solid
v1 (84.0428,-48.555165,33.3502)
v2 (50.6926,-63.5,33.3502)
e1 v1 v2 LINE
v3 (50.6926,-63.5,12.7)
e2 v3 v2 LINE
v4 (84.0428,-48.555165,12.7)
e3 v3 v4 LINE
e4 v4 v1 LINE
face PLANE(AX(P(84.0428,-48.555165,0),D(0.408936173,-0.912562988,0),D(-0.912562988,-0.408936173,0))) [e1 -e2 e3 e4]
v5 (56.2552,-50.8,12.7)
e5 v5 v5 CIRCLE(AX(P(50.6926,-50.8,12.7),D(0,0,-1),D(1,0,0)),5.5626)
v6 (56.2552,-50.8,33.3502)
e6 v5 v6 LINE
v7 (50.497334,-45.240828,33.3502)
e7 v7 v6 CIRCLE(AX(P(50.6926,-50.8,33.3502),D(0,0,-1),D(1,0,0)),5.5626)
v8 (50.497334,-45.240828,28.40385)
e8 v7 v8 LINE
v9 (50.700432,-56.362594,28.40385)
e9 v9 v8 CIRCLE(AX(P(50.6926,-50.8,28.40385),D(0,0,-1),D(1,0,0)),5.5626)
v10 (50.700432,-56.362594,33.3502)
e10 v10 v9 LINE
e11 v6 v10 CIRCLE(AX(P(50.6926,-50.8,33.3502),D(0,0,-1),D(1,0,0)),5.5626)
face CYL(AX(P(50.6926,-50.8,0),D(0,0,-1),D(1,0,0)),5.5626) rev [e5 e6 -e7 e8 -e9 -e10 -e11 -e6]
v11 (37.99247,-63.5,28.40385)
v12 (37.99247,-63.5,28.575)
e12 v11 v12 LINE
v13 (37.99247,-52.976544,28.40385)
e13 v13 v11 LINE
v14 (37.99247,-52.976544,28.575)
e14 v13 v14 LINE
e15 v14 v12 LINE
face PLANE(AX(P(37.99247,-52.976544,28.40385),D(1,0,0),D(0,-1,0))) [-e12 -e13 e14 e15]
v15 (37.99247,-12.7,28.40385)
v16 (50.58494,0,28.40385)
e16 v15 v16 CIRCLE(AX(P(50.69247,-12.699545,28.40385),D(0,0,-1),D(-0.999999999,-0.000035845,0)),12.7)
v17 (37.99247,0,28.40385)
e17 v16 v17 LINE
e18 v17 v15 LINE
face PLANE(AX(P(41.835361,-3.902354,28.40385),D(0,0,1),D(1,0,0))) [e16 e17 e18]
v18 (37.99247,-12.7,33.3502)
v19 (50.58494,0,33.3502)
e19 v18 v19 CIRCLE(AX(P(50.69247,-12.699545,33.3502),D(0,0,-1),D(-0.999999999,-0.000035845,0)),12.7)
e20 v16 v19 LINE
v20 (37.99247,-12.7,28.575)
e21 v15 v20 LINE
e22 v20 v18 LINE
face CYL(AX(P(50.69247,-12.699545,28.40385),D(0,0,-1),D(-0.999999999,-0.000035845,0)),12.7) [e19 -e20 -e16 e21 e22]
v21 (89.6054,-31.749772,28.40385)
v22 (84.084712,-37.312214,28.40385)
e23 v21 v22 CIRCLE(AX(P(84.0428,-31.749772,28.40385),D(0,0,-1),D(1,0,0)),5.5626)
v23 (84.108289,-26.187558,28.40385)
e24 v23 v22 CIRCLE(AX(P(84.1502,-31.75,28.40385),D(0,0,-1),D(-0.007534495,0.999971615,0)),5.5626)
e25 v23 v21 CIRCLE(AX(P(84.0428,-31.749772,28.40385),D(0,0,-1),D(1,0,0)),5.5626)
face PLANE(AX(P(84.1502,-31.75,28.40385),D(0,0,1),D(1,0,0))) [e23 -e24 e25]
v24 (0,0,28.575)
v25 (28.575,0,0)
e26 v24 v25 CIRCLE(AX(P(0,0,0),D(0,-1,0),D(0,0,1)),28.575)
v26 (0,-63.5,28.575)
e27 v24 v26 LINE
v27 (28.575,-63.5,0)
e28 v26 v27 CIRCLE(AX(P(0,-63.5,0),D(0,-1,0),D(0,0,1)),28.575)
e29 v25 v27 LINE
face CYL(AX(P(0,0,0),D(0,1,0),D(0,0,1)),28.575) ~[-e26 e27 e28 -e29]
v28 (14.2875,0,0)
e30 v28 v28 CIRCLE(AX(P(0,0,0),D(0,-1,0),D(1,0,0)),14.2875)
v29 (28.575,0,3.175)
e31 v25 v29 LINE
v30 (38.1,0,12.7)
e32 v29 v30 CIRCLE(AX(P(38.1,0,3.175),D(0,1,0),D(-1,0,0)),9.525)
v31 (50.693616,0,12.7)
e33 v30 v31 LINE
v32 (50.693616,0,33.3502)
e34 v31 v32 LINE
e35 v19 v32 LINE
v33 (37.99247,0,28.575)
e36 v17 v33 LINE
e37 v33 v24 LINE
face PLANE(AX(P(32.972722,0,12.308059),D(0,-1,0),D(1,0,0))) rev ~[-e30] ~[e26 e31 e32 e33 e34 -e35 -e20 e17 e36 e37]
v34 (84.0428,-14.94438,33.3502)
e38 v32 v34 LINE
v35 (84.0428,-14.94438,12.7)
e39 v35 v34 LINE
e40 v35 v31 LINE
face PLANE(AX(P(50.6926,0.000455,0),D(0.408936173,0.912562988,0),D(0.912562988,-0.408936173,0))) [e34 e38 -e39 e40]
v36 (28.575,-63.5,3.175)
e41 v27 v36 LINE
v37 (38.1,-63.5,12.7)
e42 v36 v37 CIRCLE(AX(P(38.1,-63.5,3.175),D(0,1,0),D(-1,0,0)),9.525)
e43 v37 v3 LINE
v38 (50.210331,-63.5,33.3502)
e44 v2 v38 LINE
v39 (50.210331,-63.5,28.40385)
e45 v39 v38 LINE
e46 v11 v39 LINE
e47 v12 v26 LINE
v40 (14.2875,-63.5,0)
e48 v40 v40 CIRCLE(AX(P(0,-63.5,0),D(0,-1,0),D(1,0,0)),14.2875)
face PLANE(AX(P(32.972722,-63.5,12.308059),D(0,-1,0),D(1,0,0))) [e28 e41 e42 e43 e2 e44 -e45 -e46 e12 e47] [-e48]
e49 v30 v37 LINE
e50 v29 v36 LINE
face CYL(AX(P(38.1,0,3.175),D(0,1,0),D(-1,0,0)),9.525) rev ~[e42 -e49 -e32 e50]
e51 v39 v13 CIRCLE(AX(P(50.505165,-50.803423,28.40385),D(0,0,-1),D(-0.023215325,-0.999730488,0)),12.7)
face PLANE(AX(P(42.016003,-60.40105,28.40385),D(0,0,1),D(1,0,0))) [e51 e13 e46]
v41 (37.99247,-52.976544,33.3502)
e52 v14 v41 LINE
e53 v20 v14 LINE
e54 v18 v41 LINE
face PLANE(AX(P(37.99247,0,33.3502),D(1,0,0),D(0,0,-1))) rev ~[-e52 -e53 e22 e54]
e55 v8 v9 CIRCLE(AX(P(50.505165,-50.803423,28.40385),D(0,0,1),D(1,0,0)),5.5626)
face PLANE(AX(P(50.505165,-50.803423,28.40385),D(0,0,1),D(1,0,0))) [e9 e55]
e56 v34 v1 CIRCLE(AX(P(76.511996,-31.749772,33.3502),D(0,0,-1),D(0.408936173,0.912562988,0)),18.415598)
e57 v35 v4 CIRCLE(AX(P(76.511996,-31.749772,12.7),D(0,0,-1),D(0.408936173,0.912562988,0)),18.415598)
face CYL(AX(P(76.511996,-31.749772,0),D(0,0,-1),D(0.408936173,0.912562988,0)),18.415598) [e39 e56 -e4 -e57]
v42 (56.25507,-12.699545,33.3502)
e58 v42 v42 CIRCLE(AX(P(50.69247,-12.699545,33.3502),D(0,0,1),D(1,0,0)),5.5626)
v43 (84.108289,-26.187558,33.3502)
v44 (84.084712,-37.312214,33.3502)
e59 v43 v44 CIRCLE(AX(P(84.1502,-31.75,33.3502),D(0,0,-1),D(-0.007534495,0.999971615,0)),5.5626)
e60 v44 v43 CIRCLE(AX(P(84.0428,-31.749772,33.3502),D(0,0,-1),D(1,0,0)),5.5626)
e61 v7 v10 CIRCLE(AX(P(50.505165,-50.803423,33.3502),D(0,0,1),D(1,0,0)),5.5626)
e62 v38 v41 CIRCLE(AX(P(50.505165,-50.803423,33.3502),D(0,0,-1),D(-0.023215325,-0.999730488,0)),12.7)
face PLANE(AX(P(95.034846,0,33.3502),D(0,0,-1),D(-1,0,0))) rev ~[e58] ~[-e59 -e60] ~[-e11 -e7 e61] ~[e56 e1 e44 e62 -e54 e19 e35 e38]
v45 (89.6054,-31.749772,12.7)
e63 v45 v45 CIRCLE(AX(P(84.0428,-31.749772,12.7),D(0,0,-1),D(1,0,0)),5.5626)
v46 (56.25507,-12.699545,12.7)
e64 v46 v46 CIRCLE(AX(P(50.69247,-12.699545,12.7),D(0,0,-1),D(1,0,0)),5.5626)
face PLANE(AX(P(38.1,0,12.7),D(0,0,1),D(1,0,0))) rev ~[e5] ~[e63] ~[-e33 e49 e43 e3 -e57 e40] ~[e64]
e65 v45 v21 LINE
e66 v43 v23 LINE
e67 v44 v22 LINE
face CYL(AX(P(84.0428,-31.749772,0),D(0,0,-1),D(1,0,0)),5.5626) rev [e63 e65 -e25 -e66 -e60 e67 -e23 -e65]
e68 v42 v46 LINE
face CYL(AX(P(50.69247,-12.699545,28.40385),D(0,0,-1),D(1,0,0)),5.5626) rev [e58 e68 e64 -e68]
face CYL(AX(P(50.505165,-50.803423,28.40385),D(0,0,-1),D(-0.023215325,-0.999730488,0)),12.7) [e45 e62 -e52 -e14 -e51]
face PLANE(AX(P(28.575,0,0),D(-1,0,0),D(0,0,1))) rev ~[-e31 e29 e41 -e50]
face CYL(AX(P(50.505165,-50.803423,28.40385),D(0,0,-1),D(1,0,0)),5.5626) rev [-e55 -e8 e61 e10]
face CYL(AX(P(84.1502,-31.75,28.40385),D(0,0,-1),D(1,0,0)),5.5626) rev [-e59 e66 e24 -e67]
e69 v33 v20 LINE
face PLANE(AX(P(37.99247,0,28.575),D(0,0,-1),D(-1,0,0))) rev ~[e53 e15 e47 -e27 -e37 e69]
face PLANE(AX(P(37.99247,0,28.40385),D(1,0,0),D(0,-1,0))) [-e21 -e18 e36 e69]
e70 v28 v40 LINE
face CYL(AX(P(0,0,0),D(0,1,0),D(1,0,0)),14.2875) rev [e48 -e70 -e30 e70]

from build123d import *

# Parameters (mm, degrees)
F0_R     = 14.2875
F1_DEPTH = 63.5
F3_START = 28.40385
F2_R     = 5.5626
F3_DEPTH = 4.94635
F4_R     = 5.5626
F5_DEPTH = 33.3512


with BuildPart() as f1:
    # F0 (on Front) → F1 (new body)
    with BuildSketch(Plane.XZ):
        with BuildLine():
            Line((37.9924699664, 28.575), (0, 28.575))
            ThreePointArc((0, 28.575), (-20.2055762724, -20.2055762724), (28.575, 0))
            Line((28.575, 0), (28.575, 3.175))
            ThreePointArc((28.575, 3.175), (31.3648079092, 9.9101920908), (38.1, 12.7))
            Line((38.1, 12.7), (69.85, 12.7))
            Line((69.85, 12.7), (95.0348461551, 12.7))
            Line((95.0348461551, 12.7), (95.0348461551, 33.3502))
            Line((95.0348461551, 33.3502), (37.9924699664, 33.3502))
            Line((37.9924699664, 33.3502), (37.9924699664, 28.575))
        make_face()
        Circle(F0_R, mode=Mode.SUBTRACT)
    extrude(amount=F1_DEPTH)

    # F2 (on Top) → F3 (cut)
    with BuildSketch(Plane.XY.offset(F3_START)):
        with BuildLine():
            ThreePointArc((37.9924699664, -12.7), (41.6741160957, -3.757548703), (50.5849399165, 0))
            Line((50.5849399165, 0), (37.9924699664, 0))
            Line((37.9924699664, 0), (37.9924699664, -12.7))
        make_face()
        with BuildLine():
            Line((50.5849399165, 0), (50.8, 0))
            ThreePointArc((50.8, 0), (50.6924699583, 0.000455233), (50.5849399165, 0))
        make_face()
        with BuildLine():
            Line((37.9924699664, -63.5), (50.2103307418, -63.5))
            ThreePointArc((50.2103307418, -63.5), (42.2169815898, -60.4261048405), (37.9924699664, -52.9765435338))
            Line((37.9924699664, -52.9765435338), (37.9924699664, -63.5))
        make_face()
        with BuildLine():
            ThreePointArc((50.2103307418, -63.5), (50.5051653709, -63.5034228021), (50.8, -63.5))
            Line((50.8, -63.5), (50.2103307418, -63.5))
        make_face()
        with Locations((84.1502, -31.75)):
            Circle(F2_R)
        with Locations((50.6924699583, -12.699544767)):
            Circle(F2_R)
        with Locations((50.5051653709, -50.8034228021)):
            Circle(F2_R)
    extrude(amount=F3_DEPTH, mode=Mode.SUBTRACT)

    # F4 (on Top) → F5 (cut, through all)
    with BuildSketch(Plane.XY):
        with BuildLine():
            Line((84.0428003407, -48.5551651302), (50.6926003407, -63.5))
            Line((50.6926003407, -63.5), (95.0348461551, -63.5))
            Line((95.0348461551, -63.5), (95.0348461551, 0))
            Line((95.0348461551, 0), (50.6926003407, 0.0004552323))
            Line((50.6926003407, 0.0004552323), (84.0428003407, -14.9443796375))
            ThreePointArc((84.0428003407, -14.9443796375), (94.9275939219, -31.7497723839), (84.0428003407, -48.5551651302))
        make_face()
        with Locations((84.0428003407, -31.7497723839)):
            Circle(F4_R)
        with Locations((50.6924699583, -12.699544767)):
            Circle(F4_R)
        with Locations((50.6926003407, -50.8)):
            Circle(F4_R)
    extrude(amount=F5_DEPTH, mode=Mode.SUBTRACT)


solid = f1.part
